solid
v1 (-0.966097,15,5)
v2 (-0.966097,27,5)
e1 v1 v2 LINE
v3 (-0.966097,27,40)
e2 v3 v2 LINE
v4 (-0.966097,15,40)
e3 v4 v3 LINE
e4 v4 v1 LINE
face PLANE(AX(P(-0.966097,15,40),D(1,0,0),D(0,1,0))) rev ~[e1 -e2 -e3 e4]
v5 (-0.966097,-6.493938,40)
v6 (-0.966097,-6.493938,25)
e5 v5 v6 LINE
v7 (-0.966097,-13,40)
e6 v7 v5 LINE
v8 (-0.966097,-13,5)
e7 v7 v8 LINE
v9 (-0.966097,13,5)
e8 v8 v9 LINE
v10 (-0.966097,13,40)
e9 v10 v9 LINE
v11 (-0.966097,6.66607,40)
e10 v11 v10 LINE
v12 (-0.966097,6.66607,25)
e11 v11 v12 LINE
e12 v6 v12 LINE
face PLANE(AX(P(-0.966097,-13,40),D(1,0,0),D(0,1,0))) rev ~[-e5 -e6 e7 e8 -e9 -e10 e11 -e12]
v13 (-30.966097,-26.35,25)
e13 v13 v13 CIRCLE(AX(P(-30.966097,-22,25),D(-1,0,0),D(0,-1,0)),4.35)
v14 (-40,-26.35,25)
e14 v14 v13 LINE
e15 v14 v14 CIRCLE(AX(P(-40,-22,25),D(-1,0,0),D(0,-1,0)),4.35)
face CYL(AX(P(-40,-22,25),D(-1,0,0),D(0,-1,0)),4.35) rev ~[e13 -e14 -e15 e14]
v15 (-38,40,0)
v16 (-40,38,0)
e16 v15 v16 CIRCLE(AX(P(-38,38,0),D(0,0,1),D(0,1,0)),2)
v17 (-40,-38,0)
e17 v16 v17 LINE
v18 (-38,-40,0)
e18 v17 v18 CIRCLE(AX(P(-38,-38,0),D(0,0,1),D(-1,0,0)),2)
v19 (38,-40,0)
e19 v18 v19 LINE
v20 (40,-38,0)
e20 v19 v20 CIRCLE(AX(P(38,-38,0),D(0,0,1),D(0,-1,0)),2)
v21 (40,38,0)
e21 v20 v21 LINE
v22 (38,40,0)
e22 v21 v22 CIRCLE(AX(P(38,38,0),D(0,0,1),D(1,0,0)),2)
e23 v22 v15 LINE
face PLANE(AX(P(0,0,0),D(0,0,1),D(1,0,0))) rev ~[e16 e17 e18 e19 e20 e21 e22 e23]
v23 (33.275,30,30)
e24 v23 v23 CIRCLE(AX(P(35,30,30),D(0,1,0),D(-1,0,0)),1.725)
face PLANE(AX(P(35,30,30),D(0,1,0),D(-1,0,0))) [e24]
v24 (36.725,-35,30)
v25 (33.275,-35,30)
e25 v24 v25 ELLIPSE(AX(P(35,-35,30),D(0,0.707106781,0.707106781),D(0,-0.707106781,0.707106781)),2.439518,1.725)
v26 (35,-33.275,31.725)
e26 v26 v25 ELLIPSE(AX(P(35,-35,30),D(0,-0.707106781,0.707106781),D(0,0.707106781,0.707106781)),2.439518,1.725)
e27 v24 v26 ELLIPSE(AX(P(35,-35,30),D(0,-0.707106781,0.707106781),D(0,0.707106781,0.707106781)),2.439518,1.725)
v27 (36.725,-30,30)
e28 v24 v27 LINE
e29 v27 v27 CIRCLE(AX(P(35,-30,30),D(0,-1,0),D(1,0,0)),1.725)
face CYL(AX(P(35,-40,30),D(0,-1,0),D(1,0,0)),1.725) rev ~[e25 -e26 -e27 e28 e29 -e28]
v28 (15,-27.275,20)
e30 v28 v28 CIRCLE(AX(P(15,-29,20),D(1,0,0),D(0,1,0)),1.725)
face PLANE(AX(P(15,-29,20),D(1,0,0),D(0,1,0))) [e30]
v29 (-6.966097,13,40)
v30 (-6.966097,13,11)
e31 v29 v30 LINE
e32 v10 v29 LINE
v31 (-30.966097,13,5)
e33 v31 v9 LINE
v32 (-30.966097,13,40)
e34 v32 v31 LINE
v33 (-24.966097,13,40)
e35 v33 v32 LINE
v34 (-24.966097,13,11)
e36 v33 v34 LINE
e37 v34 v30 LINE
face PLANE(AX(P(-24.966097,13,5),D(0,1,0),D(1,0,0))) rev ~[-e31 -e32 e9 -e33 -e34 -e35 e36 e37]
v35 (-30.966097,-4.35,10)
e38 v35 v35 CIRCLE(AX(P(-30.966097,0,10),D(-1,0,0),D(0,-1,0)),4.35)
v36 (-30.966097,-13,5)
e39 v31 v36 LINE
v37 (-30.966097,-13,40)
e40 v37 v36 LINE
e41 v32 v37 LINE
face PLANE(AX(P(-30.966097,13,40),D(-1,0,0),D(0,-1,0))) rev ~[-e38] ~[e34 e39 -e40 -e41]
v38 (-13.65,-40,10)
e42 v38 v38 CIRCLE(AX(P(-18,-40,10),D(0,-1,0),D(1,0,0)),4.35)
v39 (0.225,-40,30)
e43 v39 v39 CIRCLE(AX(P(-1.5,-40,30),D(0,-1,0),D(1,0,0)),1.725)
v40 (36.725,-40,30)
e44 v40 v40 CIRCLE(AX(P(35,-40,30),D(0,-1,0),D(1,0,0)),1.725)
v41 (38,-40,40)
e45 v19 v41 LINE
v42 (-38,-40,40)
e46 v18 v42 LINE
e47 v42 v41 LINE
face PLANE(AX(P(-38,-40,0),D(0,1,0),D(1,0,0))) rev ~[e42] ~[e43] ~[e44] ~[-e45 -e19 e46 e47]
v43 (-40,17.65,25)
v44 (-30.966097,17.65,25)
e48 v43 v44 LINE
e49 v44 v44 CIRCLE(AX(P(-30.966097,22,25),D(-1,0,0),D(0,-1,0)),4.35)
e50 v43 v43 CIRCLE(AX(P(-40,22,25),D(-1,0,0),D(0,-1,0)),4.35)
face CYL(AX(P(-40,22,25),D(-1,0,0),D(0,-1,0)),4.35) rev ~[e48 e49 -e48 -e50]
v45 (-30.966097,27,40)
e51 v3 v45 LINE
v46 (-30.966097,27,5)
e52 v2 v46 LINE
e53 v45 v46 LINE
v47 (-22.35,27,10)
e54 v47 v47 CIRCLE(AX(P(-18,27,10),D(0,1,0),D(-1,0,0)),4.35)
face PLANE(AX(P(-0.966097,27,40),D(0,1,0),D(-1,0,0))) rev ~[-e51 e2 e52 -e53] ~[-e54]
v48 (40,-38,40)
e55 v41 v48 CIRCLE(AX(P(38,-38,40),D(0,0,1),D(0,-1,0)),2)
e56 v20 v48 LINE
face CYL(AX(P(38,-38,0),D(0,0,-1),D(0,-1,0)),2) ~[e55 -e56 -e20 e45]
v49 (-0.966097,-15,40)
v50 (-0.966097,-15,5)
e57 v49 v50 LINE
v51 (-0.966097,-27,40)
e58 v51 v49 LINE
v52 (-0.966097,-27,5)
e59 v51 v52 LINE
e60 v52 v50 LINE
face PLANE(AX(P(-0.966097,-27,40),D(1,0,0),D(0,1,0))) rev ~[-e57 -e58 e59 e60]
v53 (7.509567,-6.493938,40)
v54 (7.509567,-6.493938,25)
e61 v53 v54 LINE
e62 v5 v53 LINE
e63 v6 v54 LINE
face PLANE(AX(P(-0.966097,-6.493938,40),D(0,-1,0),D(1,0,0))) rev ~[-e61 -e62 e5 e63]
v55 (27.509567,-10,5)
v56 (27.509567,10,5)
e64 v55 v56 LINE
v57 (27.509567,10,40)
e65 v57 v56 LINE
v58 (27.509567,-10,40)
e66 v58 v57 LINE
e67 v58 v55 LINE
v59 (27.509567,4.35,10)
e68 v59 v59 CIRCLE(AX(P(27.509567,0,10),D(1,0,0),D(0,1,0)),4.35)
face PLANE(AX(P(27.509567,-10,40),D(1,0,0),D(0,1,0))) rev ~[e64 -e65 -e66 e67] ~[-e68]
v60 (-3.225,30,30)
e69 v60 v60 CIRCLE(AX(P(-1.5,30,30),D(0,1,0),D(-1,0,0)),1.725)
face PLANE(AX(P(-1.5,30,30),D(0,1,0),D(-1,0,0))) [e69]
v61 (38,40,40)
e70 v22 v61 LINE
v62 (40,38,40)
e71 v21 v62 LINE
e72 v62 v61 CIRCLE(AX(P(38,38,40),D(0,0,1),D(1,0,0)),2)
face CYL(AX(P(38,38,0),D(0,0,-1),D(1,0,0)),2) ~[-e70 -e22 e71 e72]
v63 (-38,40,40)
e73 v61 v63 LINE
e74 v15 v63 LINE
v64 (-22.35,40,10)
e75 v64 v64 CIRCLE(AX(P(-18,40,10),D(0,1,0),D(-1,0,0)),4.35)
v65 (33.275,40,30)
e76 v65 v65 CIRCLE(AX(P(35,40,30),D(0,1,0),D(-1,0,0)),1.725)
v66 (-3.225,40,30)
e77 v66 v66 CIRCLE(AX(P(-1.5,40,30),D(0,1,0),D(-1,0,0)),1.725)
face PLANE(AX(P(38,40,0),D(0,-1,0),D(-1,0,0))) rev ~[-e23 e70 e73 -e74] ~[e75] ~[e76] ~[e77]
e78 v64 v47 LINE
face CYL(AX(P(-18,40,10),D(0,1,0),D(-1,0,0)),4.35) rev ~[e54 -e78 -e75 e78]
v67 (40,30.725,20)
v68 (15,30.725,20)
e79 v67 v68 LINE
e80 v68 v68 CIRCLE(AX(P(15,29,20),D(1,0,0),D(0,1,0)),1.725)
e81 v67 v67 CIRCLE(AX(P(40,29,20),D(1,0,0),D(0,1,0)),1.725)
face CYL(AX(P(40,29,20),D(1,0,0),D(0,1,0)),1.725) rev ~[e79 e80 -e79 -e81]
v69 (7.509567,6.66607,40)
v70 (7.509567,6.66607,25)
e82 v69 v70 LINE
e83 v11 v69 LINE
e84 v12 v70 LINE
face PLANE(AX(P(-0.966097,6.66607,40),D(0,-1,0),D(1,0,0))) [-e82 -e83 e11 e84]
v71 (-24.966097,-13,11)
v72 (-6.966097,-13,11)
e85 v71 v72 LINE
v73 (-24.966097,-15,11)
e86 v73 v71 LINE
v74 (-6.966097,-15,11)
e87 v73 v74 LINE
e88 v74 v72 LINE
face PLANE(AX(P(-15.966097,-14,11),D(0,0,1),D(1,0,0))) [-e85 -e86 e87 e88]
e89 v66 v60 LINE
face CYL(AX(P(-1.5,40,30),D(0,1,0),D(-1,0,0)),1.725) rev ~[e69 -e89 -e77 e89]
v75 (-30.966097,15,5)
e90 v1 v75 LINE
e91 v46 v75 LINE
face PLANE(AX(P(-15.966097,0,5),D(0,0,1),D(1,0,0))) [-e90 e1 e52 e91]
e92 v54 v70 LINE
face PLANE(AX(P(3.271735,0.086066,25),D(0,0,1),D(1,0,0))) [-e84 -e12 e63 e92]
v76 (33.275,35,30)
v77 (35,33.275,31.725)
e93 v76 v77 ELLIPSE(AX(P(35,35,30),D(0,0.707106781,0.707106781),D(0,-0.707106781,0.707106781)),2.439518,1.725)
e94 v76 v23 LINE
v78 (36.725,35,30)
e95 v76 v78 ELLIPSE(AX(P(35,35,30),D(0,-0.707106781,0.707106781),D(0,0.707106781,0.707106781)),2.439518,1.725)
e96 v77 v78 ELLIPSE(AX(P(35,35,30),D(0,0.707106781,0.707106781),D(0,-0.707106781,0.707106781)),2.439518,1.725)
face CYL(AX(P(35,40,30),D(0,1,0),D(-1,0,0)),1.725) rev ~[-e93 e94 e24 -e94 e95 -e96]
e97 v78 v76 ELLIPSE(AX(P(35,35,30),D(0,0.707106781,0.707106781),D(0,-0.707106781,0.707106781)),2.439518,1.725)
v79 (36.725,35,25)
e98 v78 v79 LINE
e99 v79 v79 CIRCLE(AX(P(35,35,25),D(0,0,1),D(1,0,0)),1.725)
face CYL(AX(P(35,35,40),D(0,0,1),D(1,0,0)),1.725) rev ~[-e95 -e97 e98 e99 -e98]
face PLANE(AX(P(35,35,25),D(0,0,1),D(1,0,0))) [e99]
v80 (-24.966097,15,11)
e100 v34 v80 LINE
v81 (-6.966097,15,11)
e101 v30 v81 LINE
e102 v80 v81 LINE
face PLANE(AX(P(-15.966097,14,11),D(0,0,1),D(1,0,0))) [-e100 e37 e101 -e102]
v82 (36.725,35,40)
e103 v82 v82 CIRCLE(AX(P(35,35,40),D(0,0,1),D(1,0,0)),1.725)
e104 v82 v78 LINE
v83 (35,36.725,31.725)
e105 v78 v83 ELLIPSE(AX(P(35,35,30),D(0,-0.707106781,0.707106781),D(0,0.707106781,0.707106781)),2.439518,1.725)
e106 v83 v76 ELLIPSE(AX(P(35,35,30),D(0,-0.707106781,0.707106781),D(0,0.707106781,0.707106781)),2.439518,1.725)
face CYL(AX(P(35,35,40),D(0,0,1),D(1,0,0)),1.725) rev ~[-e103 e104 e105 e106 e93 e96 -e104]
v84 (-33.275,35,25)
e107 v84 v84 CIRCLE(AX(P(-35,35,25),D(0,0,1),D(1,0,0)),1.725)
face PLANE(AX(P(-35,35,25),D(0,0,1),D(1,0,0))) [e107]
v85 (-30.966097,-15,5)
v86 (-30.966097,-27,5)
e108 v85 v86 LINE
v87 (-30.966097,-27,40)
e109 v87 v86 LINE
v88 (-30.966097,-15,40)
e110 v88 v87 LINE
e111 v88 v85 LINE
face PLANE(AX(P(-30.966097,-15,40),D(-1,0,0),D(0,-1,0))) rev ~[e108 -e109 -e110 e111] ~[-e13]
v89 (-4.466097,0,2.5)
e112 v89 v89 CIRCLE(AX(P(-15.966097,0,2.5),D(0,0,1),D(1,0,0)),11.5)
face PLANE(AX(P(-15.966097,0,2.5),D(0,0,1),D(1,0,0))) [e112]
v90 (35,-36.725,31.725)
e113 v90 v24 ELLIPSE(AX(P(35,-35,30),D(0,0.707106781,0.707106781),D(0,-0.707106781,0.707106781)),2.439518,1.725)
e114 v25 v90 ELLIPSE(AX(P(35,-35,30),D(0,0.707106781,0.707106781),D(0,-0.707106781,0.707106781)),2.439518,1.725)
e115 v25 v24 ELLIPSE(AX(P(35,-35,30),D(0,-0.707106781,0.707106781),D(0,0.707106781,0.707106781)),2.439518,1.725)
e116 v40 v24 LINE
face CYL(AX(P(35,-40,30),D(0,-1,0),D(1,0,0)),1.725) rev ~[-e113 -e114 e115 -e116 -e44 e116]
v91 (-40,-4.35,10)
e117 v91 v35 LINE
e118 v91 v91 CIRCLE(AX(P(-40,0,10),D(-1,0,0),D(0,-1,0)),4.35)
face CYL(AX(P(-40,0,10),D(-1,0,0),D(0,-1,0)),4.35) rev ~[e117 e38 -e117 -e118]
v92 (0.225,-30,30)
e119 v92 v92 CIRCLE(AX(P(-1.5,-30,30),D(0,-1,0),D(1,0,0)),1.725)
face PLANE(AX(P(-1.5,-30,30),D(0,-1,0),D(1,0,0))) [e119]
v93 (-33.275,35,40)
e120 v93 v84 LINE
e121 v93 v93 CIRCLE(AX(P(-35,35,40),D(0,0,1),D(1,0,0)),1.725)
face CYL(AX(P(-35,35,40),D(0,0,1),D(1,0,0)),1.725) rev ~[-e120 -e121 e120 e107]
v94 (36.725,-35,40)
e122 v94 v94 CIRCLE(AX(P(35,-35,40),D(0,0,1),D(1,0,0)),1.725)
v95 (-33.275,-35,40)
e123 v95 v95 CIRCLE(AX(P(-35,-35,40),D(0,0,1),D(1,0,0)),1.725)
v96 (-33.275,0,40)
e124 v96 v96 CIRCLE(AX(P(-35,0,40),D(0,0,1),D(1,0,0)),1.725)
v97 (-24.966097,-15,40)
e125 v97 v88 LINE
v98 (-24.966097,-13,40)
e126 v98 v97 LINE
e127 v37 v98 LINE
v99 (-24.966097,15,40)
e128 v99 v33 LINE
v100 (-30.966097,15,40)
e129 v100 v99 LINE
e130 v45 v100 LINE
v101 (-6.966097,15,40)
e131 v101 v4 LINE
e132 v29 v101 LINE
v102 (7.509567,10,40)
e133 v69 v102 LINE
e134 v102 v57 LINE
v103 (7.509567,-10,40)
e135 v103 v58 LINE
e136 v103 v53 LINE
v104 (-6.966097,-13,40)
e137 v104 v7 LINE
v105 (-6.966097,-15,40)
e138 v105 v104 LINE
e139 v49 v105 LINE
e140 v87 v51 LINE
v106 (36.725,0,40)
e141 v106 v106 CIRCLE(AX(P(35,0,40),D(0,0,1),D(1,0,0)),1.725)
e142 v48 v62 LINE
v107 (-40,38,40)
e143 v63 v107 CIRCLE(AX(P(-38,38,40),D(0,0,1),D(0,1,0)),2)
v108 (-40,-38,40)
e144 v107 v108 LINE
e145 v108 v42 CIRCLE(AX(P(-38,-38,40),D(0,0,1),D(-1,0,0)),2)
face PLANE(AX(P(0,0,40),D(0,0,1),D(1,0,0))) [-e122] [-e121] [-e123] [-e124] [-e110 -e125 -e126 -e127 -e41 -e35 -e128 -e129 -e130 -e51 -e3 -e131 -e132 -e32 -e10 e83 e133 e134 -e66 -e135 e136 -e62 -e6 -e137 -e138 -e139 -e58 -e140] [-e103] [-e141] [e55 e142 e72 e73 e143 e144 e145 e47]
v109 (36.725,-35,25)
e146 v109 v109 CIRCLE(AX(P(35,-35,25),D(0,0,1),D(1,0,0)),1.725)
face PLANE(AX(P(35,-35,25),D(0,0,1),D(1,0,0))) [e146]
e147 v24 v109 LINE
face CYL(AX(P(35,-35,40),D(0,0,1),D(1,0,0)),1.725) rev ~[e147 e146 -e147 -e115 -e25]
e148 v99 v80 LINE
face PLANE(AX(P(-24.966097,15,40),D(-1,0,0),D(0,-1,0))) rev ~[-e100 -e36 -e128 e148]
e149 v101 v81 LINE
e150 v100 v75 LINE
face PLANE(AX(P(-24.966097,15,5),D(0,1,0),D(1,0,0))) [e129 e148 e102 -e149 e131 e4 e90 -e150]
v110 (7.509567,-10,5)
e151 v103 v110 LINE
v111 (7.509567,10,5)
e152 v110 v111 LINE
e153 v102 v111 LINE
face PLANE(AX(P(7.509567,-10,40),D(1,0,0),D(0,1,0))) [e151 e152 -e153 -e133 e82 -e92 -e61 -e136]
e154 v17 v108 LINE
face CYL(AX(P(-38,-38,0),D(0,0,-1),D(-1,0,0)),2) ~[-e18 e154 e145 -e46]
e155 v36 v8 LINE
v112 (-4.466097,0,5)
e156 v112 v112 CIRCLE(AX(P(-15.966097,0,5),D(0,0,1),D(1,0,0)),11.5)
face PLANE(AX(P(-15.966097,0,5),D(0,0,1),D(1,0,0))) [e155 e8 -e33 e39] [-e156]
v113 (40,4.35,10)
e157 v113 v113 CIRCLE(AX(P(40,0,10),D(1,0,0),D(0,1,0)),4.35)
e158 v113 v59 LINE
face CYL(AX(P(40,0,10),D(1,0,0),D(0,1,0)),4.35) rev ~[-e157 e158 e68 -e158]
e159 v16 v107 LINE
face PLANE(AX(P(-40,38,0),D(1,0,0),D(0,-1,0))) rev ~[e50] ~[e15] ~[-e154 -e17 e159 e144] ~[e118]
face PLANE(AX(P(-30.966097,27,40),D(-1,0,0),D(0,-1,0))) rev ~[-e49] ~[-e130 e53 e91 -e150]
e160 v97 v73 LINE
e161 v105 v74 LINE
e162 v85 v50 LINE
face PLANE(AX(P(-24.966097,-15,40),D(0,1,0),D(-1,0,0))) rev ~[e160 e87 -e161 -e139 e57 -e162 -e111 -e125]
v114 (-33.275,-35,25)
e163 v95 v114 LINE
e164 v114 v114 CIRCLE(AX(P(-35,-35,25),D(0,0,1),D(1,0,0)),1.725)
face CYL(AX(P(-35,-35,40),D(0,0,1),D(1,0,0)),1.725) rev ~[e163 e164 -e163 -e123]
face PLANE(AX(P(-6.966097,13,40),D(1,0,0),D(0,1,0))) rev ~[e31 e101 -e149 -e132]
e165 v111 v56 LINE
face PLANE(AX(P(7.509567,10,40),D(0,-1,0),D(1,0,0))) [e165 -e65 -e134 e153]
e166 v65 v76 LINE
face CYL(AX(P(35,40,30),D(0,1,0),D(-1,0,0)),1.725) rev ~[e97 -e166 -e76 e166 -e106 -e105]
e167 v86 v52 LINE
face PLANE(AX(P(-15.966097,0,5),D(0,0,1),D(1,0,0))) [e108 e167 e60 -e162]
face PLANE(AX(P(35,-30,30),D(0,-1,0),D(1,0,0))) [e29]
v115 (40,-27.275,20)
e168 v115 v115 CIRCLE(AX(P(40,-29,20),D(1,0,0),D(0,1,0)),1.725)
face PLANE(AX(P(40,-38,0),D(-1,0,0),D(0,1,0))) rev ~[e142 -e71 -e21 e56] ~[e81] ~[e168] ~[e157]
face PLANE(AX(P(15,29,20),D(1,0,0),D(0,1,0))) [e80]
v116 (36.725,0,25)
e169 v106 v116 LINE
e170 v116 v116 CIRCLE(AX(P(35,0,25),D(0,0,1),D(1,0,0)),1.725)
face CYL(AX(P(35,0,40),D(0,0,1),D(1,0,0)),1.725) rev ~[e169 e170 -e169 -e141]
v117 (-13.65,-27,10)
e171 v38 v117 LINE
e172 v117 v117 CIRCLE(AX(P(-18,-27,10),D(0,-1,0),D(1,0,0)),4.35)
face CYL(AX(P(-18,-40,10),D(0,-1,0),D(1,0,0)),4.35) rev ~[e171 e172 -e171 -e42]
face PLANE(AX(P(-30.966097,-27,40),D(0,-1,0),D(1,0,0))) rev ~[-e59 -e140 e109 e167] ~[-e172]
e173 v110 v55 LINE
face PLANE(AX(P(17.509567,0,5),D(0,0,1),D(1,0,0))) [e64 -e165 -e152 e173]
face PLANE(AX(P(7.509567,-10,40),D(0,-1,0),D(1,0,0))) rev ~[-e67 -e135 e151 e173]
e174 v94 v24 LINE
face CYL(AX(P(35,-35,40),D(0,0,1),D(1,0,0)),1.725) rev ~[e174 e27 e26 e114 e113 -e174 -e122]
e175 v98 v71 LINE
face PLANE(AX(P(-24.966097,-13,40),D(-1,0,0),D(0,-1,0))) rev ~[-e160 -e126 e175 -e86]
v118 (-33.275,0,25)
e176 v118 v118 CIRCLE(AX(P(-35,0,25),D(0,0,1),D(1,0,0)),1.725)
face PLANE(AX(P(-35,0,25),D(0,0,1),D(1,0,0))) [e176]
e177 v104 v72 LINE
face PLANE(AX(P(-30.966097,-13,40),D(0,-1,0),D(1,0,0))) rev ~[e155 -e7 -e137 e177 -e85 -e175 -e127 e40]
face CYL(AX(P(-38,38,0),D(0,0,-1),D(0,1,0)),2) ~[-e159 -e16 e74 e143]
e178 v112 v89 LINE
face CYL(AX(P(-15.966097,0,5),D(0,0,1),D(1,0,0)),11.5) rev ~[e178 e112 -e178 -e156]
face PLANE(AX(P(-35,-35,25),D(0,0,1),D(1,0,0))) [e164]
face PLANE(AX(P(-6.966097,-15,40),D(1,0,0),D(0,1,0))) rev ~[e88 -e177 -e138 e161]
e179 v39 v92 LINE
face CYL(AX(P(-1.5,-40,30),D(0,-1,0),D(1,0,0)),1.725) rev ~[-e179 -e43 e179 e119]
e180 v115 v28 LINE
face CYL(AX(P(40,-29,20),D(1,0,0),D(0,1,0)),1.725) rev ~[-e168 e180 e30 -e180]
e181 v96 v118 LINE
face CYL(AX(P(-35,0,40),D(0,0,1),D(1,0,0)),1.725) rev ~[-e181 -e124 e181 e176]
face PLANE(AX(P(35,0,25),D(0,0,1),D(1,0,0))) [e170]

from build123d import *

# Parameters (mm, degrees)
F1_DEPTH  = 40
F2_W      = 20
F2_H      = 20
F3_DEPTH  = 35
F4_R      = 4.35
F5_DEPTH  = 15
F6_R      = 4.35
F7_DEPTH  = 15
F8_W      = 8.4756634911
F8_H      = 13.160008005
F9_DEPTH  = 15
F10_R     = 1.725
F11_DEPTH = 15
F12_R     = 11.5
F13_DEPTH = 2.5
F14_R     = 1.725
F15_DEPTH = 10
F16_R     = 1.725
F17_DEPTH = 10
F18_R     = 1.725
F19_DEPTH = 25
F20_R     = 4.35
F21_DEPTH = 15
F22_R     = 4.35
F23_DEPTH = 15
F24_W     = 18
F24_H     = 2
F25_DEPTH = 6


# Not quite as in the source:
# - a feature names something its author has since deleted; it is built from what else it names


with BuildPart() as f1:
    # F0 (on Top) → F1 (new body)
    with BuildSketch(Plane.XY):
        with BuildLine():
            ThreePointArc((40, 38), (39.4142135624, 39.4142135624), (38, 40))
            Line((38, 40), (-38, 40))
            ThreePointArc((-38, 40), (-39.4142135624, 39.4142135624), (-40, 38))
            Line((-40, 38), (-40, -38))
            ThreePointArc((-40, -38), (-39.4142135624, -39.4142135624), (-38, -40))
            Line((-38, -40), (38, -40))
            ThreePointArc((38, -40), (39.4142135624, -39.4142135624), (40, -38))
            Line((40, -38), (40, 38))
        make_face()
    extrude(amount=F1_DEPTH)

    # F2 (on face) → F3 (cut)
    with BuildSketch(Plane.XY.offset(40)):
        with Locations((17.50956662, 0)):
            Rectangle(F2_W, F2_H)
        Polygon((-24.9660968933, -15), (-30.9660968933, -15), (-30.9660968933, -26.9999999998), (-0.9660968933, -26.9999999998), (-0.9660968933, -15), (-6.9660968933, -15), (-6.9660968933, -13), (-0.9660968933, -13), (-0.9660968933, 13), (-6.9660968933, 13), (-6.9660968933, 15), (-0.9660968933, 15), (-0.9660968933, 26.9999999998), (-30.9660968933, 26.9999999998), (-30.9660968933, 15), (-24.9660968933, 15), (-24.9660968933, 13), (-30.9660968933, 13), (-30.9660968933, -13), (-24.9660968933, -13), align=None)
    extrude(amount=-F3_DEPTH, mode=Mode.SUBTRACT)

    # F4 (on face) → F5 (cut)
    with BuildSketch(Plane(origin=(-40, 0, 0), x_dir=(0, -1, 0), z_dir=(-1, 0, 0))):
        with Locations((-22, 25)):
            Circle(F4_R)
        with Locations((22, 25)):
            Circle(F4_R)
        with Locations((0, 10)):
            Circle(F4_R)
    extrude(amount=-F5_DEPTH, mode=Mode.SUBTRACT)

    # F6 (on face) → F7 (cut)
    with BuildSketch(Plane.YZ.offset(40)):
        with Locations((0, 10)):
            Circle(F6_R)
    extrude(amount=-F7_DEPTH, mode=Mode.SUBTRACT)

    # F8 (on face) → F9 (cut)
    with BuildSketch(Plane.XY.offset(40)):
        with Locations((3.2717348745, 0.0860663135)):
            Rectangle(F8_W, F8_H)
    extrude(amount=-F9_DEPTH, mode=Mode.SUBTRACT)

    # F10 (on face) → F11 (cut)
    with BuildSketch(Plane.XY.offset(40)):
        with Locations((-35, 0)):
            Circle(F10_R)
        with Locations((35, 0)):
            Circle(F10_R)
        with Locations((-35, 35)):
            Circle(F10_R)
        with Locations((-35, -35)):
            Circle(F10_R)
        with Locations((35, 35)):
            Circle(F10_R)
        with Locations((35, -35)):
            Circle(F10_R)
    extrude(amount=-F11_DEPTH, mode=Mode.SUBTRACT)

    # F12 (on face) → F13 (cut)
    with BuildSketch(Plane.XY.offset(5)):
        with Locations((-15.966096893, 0)):
            Circle(F12_R)
    extrude(amount=-F13_DEPTH, mode=Mode.SUBTRACT)

    # F14 (on face) → F15 (cut)
    with BuildSketch(Plane.XZ.offset(40)):
        with Locations((-1.5, 30)):
            Circle(F14_R)
        with Locations((35, 30)):
            Circle(F14_R)
    extrude(amount=-F15_DEPTH, mode=Mode.SUBTRACT)

    # F16 (on face) → F17 (cut)
    with BuildSketch(Plane(origin=(0, 40, 0), x_dir=(-1, 0, 0), z_dir=(0, 1, 0))):
        with Locations((-35, 30)):
            Circle(F16_R)
        with Locations((1.5, 30)):
            Circle(F16_R)
    extrude(amount=-F17_DEPTH, mode=Mode.SUBTRACT)

    # F18 (on face) → F19 (cut)
    with BuildSketch(Plane.YZ.offset(40)):
        with Locations((-29, 20)):
            Circle(F18_R)
        with Locations((29, 20)):
            Circle(F18_R)
    extrude(amount=-F19_DEPTH, mode=Mode.SUBTRACT)

    # F20 (on face) → F21 (cut)
    with BuildSketch(Plane(origin=(0, 40, 0), x_dir=(-1, 0, 0), z_dir=(0, 1, 0))):
        with Locations((18, 10)):
            Circle(F20_R)
    extrude(amount=-F21_DEPTH, mode=Mode.SUBTRACT)

    # F22 (on face) → F23 (cut)
    with BuildSketch(Plane.XZ.offset(40)):
        with Locations((-18, 10)):
            Circle(F22_R)
    extrude(amount=-F23_DEPTH, mode=Mode.SUBTRACT)

    # F24 (on face) → F25 (join)
    with BuildSketch(Plane.XY.offset(5)):
        with Locations((-15.9660968933, 14)):
            Rectangle(F24_W, F24_H)
        with Locations((-15.9660968933, -14)):
            Rectangle(F24_W, F24_H)
    extrude(amount=F25_DEPTH)


solid = f1.part
